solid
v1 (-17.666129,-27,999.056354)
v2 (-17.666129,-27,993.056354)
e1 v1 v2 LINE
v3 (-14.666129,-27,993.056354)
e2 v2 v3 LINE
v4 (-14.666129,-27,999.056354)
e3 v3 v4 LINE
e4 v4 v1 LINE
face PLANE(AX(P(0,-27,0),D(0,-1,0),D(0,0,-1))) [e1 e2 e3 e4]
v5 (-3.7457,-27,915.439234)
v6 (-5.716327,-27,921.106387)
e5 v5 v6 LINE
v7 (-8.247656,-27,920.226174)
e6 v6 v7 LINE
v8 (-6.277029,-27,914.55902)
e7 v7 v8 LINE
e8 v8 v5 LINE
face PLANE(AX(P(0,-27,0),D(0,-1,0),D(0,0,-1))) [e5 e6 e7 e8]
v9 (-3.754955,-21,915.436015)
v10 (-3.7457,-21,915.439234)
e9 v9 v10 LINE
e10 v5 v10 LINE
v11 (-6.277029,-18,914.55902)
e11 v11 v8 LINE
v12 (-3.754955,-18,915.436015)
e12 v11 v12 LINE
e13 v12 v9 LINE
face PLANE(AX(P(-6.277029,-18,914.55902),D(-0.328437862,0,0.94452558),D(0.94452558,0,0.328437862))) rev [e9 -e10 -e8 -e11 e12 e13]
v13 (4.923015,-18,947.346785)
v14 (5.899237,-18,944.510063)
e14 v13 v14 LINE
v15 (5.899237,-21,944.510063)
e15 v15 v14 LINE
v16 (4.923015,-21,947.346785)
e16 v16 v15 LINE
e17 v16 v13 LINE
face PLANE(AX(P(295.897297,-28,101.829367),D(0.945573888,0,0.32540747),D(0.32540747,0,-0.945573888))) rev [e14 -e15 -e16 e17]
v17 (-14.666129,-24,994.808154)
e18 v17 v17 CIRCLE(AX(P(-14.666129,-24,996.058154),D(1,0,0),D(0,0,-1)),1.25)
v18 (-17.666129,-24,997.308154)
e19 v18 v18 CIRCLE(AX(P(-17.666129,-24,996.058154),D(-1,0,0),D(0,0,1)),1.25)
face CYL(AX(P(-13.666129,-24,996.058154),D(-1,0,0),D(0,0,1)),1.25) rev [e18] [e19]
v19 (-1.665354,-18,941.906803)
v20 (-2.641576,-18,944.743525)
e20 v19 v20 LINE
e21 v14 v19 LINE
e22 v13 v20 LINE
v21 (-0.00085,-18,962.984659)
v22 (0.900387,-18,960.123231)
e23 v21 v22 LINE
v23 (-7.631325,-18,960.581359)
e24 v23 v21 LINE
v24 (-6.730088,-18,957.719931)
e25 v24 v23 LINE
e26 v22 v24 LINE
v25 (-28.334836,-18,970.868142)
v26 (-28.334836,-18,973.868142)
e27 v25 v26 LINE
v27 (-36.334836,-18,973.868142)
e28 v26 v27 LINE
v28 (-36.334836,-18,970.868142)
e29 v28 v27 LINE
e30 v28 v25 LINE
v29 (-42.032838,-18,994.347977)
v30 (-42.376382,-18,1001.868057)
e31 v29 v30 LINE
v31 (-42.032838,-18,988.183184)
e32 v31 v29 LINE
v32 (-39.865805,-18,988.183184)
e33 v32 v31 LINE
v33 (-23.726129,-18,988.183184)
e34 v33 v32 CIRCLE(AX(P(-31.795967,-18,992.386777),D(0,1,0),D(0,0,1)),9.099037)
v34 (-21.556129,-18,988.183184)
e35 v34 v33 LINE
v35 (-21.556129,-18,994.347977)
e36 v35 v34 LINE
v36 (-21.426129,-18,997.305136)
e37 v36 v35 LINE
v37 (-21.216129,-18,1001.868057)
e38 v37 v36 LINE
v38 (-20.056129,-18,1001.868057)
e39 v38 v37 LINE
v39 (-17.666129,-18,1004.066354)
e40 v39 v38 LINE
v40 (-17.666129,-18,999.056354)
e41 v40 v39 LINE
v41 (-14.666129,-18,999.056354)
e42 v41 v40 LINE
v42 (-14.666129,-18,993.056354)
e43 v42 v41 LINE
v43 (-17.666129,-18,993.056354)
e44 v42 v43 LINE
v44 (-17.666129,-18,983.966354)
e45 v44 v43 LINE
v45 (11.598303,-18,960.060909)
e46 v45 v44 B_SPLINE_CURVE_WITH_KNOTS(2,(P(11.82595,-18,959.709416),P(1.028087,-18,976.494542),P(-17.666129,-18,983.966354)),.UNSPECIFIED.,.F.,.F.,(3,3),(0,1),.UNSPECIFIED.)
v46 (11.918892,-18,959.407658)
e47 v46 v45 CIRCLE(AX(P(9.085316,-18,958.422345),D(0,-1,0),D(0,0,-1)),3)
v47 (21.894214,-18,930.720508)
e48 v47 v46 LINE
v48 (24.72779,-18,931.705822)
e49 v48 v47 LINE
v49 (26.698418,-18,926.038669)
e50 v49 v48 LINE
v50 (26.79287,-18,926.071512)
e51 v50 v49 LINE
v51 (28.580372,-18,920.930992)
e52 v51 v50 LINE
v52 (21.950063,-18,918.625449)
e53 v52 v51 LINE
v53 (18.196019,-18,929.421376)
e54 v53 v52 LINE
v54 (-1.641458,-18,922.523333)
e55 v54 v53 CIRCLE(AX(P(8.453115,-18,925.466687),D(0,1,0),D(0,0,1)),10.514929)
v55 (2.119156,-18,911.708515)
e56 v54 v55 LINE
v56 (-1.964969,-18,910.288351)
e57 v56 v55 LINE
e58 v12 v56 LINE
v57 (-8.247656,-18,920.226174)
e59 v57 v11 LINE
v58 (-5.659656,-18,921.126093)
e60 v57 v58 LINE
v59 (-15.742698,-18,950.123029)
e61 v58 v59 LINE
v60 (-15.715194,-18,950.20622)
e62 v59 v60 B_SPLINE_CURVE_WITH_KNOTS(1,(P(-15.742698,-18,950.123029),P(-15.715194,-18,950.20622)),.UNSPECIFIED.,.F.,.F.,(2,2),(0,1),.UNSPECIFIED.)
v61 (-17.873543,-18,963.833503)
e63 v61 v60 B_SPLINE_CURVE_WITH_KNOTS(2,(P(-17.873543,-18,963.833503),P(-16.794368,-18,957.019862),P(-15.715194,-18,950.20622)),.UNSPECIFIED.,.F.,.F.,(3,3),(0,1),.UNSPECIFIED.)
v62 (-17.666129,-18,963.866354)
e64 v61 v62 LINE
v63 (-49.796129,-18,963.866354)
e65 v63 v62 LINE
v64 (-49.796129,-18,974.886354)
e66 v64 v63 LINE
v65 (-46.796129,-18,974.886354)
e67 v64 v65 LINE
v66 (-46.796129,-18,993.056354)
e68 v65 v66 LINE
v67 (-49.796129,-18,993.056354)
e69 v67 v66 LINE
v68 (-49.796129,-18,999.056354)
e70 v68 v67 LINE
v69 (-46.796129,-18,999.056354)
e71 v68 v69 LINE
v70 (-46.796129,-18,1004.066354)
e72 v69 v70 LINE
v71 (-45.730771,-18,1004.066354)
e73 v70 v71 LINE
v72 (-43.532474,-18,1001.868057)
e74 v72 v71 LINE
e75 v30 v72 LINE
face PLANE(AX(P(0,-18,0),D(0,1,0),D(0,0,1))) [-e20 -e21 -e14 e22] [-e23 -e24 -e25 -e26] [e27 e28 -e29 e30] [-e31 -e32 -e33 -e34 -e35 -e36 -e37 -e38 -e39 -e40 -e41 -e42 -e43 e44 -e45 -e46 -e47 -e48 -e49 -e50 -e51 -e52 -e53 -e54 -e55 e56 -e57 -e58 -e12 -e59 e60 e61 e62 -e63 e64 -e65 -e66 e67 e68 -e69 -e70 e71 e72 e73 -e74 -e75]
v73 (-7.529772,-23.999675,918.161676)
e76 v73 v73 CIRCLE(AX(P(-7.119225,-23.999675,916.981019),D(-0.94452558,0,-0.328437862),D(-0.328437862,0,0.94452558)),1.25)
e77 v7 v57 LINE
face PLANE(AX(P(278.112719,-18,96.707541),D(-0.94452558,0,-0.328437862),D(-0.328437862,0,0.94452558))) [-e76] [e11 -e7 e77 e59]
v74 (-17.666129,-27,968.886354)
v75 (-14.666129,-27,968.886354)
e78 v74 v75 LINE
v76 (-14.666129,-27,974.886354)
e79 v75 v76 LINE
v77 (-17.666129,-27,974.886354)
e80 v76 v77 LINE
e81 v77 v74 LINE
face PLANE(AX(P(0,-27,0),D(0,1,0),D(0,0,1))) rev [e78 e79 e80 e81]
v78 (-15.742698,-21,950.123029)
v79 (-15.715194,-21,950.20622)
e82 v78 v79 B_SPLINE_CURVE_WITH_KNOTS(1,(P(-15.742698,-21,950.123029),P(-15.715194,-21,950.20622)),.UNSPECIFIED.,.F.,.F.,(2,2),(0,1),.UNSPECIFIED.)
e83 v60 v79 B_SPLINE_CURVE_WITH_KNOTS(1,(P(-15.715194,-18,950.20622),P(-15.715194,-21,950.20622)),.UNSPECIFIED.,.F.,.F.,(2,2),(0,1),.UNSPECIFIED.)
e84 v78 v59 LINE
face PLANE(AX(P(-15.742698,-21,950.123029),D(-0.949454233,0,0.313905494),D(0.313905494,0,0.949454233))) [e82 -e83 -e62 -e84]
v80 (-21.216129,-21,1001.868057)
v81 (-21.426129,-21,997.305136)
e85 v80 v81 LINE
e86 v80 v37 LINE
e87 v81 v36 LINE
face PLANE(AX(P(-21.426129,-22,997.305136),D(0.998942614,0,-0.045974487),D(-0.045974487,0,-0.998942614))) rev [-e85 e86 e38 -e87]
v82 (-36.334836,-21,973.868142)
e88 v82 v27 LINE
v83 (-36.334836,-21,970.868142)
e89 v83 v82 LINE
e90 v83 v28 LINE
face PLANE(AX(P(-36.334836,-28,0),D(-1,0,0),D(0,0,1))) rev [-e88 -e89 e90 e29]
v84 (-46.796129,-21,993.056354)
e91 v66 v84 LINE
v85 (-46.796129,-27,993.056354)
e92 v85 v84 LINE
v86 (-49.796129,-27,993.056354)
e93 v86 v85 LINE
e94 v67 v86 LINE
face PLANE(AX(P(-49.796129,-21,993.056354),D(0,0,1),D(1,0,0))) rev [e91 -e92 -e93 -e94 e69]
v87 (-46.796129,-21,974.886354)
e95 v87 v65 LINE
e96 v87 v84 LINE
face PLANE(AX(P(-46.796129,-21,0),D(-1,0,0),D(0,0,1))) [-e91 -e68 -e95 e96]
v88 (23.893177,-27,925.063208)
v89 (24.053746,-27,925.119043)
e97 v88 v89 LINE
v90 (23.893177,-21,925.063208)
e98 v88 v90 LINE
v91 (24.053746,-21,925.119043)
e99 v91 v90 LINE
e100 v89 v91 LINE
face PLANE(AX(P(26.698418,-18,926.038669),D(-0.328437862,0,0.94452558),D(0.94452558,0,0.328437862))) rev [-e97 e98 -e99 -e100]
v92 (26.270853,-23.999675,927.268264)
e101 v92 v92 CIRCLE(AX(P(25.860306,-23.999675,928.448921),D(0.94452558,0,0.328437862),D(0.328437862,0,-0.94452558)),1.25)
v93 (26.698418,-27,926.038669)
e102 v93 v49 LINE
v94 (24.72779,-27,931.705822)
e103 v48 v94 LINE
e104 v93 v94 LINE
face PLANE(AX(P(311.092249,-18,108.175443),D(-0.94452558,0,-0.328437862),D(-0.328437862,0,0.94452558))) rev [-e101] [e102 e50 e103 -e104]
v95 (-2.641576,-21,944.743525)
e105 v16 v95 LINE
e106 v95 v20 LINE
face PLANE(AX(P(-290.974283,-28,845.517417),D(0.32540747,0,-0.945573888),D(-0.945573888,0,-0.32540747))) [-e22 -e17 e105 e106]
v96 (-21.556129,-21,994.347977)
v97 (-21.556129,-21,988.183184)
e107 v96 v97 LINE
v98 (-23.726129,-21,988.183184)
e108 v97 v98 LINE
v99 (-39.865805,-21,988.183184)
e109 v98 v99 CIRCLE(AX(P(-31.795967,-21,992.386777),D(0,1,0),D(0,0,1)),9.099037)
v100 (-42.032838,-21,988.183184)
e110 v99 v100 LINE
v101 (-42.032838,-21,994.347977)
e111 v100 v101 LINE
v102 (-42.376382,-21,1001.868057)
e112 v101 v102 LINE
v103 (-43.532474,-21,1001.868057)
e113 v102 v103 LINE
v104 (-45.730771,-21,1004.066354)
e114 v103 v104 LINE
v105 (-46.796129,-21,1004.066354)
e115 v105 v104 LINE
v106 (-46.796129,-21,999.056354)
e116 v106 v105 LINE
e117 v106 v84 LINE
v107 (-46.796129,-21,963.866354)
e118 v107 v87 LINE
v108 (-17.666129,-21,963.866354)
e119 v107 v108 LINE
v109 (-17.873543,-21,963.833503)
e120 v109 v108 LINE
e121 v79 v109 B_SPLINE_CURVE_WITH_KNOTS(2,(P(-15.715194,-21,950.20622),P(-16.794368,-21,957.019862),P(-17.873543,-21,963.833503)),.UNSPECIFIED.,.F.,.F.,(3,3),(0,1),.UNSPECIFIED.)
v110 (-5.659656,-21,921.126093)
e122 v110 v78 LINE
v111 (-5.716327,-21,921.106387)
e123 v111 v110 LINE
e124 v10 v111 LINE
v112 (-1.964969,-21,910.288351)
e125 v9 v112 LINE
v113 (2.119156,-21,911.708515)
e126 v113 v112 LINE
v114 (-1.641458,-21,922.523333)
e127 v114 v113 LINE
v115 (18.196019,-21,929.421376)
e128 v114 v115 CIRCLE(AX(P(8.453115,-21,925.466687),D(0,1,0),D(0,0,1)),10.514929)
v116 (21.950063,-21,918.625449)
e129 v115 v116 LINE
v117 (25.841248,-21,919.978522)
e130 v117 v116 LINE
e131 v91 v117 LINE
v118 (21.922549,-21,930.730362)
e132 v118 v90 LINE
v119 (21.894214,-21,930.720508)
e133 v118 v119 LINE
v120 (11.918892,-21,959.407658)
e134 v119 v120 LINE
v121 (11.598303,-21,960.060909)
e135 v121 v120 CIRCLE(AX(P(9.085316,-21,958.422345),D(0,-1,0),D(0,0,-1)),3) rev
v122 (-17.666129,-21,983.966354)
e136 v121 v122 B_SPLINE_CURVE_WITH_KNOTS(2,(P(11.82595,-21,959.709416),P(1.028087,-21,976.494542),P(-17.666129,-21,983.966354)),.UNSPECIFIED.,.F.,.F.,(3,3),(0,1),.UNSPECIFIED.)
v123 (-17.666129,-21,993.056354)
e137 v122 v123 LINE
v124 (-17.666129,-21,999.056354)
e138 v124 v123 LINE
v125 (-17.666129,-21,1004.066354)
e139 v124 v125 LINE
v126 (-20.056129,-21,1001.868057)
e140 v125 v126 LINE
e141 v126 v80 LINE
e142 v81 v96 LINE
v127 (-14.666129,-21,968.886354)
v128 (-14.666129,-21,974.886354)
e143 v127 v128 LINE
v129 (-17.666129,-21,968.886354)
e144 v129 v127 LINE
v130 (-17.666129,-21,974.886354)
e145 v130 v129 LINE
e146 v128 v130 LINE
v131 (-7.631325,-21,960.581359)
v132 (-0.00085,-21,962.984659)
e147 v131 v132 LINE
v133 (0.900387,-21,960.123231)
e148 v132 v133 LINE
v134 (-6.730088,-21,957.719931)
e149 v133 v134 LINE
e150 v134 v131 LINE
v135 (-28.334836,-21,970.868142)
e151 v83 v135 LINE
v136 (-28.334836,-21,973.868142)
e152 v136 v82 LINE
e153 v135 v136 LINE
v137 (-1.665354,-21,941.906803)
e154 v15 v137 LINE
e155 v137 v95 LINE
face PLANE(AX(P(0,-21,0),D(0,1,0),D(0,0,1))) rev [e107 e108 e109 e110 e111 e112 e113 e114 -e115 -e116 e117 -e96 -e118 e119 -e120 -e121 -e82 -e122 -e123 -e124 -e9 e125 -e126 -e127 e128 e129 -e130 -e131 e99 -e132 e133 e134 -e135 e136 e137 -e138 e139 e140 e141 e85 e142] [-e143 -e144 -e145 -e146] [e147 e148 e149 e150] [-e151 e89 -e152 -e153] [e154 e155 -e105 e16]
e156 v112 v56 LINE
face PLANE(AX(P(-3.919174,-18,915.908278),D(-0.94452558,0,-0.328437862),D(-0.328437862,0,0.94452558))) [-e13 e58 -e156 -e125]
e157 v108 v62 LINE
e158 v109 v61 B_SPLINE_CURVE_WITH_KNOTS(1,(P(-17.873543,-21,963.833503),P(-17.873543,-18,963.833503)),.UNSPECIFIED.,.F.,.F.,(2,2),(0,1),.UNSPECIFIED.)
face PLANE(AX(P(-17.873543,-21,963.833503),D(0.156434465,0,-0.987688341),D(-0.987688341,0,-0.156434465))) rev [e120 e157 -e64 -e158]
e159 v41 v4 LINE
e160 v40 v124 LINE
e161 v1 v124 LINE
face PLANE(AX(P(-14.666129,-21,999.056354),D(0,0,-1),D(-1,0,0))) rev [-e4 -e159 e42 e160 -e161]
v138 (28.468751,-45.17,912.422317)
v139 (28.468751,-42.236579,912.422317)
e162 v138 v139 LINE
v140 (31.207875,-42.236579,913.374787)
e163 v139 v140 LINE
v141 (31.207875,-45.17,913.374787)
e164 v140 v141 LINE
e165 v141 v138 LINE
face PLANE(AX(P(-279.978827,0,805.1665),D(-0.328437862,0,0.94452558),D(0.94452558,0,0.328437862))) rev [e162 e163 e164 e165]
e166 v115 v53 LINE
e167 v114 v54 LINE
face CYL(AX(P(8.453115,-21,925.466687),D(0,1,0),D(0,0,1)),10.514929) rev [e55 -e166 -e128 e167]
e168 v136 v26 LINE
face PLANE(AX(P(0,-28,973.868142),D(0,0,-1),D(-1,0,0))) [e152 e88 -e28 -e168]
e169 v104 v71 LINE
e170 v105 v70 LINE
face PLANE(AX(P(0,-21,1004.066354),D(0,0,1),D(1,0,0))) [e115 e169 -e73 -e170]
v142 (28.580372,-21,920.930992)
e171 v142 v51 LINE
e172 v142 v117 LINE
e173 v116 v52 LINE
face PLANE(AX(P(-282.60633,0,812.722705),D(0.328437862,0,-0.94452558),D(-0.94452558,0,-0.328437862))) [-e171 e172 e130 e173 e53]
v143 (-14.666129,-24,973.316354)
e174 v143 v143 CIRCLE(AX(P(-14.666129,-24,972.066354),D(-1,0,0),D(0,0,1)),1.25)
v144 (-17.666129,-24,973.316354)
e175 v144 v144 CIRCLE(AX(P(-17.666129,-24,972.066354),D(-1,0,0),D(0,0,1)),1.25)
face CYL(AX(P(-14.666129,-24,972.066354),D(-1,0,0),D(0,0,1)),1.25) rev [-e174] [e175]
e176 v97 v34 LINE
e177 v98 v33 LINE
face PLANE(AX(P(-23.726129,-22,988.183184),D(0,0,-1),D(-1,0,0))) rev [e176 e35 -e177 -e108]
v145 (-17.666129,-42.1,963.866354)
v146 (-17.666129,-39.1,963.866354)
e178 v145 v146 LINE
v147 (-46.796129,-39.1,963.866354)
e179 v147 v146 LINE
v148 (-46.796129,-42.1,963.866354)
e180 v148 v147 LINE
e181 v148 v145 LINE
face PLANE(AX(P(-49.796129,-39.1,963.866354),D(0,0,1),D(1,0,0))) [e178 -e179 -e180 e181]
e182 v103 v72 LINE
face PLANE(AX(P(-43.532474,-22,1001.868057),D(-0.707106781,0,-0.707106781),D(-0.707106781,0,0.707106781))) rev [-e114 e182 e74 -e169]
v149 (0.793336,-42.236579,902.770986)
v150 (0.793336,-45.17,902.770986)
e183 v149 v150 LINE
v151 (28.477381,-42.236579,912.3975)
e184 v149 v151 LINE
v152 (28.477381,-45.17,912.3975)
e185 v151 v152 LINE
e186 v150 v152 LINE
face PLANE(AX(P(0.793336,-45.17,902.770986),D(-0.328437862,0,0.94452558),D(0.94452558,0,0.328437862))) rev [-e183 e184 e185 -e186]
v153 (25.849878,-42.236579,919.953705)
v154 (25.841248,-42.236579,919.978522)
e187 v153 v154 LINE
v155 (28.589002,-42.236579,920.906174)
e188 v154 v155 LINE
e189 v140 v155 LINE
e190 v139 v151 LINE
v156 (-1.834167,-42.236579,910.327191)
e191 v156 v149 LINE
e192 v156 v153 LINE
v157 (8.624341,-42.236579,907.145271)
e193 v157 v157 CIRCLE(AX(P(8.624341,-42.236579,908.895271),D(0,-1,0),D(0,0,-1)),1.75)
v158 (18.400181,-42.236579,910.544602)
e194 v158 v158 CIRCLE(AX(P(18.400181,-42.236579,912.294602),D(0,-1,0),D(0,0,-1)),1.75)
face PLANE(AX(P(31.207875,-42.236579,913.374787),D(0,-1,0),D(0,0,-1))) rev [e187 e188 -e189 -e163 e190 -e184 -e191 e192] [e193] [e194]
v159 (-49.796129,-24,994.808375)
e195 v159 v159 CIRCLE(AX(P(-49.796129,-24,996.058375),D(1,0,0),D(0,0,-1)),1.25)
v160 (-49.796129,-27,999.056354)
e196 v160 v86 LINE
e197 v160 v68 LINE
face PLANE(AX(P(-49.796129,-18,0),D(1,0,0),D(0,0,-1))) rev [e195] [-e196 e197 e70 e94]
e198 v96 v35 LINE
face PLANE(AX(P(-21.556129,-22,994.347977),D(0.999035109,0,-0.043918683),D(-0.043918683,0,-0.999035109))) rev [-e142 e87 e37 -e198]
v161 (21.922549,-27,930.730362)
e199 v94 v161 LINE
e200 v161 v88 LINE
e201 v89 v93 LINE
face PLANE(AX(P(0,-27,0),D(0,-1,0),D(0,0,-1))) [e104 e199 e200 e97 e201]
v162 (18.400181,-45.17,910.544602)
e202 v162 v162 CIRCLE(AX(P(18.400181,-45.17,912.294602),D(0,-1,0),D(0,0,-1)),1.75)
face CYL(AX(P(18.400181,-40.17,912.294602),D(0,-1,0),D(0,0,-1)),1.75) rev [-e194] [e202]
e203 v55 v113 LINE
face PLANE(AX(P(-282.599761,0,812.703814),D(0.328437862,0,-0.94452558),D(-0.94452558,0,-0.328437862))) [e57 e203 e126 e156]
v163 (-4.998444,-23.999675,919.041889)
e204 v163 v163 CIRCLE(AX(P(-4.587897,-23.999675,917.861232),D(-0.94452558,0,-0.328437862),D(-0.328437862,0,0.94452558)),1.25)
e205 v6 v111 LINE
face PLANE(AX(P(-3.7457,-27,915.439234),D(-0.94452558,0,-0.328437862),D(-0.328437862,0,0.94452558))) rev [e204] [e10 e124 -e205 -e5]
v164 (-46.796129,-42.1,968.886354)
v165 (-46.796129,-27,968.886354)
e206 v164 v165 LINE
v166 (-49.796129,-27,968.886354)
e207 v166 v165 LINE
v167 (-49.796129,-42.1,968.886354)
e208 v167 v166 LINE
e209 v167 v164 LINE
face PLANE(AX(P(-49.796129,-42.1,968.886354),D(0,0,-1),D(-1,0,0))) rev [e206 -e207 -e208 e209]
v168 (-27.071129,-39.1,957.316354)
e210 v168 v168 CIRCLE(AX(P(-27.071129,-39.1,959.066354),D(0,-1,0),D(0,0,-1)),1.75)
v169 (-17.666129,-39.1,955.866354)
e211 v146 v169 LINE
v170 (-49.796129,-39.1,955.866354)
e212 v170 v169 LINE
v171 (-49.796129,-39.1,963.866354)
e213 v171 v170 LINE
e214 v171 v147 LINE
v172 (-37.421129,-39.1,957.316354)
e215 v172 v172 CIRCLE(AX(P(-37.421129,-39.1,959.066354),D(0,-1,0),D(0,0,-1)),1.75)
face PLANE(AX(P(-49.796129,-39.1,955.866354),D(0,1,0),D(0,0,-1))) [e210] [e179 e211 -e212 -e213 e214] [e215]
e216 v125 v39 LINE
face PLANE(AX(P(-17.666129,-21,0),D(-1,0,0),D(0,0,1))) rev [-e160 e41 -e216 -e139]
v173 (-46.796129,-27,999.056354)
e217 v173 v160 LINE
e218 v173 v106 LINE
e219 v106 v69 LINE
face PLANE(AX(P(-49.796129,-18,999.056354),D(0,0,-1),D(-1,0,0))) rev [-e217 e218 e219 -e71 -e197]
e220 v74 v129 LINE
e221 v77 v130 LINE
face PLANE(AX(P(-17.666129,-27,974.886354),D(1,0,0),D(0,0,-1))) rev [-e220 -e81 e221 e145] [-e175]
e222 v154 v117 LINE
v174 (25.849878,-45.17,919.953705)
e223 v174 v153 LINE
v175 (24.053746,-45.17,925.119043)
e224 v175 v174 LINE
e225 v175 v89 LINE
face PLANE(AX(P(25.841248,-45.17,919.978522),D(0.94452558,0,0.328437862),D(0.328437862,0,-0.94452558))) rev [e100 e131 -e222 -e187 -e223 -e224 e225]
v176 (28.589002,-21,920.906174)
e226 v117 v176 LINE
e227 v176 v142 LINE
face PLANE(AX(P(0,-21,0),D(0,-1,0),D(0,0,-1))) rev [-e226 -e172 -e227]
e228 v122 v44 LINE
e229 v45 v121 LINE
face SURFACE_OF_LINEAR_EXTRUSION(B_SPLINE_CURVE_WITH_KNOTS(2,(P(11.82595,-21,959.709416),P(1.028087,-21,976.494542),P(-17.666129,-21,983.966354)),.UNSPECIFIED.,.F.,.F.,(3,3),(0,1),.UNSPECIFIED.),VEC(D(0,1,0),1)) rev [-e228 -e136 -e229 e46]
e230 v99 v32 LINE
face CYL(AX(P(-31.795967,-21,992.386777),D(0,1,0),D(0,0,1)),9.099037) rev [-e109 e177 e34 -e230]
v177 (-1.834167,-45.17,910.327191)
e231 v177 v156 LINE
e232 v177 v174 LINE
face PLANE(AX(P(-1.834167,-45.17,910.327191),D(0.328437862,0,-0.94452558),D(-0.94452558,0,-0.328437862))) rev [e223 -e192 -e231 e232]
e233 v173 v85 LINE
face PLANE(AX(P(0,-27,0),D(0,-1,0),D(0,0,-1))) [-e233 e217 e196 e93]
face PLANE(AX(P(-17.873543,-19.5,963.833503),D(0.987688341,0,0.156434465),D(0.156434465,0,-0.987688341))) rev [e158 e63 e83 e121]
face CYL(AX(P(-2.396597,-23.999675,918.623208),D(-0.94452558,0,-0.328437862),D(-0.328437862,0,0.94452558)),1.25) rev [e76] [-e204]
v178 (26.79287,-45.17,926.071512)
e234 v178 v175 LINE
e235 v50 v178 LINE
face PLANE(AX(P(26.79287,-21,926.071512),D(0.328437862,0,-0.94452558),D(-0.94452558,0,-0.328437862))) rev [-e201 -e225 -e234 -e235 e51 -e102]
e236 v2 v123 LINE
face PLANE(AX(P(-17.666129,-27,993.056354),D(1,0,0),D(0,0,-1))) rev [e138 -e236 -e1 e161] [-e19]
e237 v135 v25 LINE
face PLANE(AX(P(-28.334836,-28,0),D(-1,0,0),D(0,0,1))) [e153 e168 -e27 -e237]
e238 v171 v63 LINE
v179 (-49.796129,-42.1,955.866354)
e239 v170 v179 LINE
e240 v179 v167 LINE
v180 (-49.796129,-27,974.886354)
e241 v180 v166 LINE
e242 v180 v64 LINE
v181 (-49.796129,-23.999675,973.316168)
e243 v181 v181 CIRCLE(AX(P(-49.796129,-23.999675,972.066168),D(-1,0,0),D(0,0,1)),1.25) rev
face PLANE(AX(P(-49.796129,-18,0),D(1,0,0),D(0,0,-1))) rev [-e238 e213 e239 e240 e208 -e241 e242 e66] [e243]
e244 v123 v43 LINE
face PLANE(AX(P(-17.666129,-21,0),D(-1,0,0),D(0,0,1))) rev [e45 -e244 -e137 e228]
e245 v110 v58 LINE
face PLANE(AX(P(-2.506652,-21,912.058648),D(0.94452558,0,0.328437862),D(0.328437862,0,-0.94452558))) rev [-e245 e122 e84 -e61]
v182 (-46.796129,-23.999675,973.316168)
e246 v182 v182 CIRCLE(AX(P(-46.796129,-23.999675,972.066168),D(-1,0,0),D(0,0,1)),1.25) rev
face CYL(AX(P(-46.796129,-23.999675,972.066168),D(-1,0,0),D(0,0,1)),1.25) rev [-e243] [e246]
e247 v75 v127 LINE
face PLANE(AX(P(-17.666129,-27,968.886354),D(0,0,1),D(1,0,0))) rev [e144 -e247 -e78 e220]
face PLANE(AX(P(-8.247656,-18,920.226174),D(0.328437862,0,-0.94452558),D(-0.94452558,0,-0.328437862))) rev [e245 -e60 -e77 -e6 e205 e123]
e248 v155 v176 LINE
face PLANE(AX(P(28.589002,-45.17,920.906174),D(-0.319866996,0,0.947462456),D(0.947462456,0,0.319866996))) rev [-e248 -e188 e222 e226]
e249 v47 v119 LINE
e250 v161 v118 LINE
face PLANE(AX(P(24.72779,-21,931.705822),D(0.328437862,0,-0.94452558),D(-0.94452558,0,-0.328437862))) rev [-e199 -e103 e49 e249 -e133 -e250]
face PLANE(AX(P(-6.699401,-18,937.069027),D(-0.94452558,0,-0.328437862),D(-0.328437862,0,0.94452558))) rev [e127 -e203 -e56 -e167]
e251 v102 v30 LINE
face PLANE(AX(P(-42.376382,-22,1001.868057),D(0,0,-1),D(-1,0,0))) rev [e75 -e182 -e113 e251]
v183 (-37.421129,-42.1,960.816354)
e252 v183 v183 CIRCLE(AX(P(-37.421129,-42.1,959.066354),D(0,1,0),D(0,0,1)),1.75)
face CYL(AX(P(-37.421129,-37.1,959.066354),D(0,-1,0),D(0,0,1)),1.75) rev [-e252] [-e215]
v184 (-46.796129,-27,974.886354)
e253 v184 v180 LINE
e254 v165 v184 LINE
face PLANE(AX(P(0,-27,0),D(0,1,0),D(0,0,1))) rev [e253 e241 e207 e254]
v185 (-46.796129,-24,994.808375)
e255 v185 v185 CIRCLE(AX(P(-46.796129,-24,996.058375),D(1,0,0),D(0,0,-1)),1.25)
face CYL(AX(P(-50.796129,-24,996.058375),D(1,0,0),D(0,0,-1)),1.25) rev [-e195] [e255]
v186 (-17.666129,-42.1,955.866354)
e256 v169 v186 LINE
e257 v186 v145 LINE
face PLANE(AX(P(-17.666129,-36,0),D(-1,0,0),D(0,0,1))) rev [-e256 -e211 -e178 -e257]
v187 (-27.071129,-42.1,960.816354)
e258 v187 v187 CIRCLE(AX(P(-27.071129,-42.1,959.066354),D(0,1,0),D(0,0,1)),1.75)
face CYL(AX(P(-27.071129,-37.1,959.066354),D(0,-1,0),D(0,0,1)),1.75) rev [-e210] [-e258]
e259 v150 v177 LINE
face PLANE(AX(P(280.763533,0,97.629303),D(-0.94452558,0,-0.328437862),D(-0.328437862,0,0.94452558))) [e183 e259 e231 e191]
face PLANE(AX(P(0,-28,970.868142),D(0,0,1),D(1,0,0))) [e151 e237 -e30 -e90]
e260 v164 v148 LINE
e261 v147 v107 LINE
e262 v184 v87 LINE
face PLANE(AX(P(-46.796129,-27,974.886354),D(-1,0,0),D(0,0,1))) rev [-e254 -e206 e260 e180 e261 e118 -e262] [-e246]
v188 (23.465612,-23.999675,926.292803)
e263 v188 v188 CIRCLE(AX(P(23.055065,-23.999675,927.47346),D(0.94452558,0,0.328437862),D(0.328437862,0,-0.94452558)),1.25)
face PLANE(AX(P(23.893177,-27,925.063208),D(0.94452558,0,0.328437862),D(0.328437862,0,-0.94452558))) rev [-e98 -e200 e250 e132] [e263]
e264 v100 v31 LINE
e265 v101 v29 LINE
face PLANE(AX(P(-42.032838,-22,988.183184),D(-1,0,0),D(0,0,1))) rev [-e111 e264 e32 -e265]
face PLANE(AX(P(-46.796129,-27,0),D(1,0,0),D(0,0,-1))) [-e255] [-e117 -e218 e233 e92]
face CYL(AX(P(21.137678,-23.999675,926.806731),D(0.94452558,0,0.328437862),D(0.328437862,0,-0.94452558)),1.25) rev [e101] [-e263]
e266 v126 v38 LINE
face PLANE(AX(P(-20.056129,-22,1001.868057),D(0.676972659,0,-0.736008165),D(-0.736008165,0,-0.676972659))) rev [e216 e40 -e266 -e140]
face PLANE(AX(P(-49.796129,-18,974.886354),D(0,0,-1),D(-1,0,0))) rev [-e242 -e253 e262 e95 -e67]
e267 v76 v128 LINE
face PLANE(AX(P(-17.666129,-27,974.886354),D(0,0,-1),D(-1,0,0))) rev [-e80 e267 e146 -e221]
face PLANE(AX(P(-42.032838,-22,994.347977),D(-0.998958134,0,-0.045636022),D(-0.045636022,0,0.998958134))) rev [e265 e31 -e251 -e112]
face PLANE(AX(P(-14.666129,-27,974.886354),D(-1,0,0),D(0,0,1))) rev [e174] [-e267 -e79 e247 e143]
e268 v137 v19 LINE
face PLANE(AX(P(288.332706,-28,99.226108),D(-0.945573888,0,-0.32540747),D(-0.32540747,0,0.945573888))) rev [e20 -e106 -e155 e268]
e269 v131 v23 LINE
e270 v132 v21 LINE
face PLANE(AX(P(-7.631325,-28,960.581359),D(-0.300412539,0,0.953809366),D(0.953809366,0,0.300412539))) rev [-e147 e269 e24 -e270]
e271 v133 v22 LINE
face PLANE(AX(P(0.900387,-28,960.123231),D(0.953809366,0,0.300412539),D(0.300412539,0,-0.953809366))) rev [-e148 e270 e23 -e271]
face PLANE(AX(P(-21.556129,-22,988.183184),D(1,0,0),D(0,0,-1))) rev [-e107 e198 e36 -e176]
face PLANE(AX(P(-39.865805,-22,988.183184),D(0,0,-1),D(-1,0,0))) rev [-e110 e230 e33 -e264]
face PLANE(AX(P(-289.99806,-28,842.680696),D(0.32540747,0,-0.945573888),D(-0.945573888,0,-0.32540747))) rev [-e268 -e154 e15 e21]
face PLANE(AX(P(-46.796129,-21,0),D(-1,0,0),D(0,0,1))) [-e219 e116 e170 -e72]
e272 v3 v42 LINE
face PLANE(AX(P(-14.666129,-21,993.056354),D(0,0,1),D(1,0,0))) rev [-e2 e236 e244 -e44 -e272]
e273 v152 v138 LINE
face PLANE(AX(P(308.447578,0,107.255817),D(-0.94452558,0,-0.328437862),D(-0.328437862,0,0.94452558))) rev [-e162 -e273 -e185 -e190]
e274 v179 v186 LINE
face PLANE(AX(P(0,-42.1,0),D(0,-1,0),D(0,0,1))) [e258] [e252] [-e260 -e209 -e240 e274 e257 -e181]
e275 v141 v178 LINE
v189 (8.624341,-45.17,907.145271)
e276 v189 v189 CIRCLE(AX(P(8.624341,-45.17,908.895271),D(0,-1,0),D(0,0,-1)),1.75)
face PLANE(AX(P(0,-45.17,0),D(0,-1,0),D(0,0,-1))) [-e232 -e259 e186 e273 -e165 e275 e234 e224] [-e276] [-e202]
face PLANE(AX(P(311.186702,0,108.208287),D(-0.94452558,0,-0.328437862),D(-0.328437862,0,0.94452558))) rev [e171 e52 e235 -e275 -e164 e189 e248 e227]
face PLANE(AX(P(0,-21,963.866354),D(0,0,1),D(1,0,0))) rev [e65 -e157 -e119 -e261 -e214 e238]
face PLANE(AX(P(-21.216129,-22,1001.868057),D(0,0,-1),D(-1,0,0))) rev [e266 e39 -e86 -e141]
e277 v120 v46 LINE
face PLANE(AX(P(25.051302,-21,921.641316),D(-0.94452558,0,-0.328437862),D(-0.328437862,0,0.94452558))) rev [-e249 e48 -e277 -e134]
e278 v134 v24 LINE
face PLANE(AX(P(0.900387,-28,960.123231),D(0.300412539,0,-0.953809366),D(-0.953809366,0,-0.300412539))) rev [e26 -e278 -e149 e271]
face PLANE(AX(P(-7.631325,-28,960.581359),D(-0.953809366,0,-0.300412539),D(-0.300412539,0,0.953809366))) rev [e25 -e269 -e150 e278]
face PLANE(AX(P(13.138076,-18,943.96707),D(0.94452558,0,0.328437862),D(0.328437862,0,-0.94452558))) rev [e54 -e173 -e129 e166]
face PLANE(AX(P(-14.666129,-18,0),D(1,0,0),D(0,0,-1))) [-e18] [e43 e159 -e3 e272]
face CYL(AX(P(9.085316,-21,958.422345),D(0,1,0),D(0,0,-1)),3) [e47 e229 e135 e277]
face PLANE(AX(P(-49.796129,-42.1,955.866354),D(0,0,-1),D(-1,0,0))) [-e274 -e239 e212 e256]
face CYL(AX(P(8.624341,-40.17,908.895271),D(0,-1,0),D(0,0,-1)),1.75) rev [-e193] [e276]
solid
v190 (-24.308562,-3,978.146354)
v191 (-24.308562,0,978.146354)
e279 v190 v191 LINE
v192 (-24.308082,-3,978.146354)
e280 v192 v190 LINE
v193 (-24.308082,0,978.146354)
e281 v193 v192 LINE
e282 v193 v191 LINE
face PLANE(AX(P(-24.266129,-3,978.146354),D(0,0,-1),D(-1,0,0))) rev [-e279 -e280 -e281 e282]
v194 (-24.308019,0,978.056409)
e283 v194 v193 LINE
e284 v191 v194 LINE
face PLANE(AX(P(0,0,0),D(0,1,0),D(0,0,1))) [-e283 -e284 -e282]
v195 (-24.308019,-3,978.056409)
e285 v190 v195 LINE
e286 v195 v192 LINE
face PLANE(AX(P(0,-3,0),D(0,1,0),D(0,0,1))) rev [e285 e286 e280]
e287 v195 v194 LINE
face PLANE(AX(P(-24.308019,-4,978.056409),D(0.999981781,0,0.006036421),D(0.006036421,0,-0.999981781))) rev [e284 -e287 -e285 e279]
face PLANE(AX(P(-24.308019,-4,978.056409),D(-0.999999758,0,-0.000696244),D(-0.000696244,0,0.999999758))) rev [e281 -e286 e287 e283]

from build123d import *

# Parameters (mm, degrees)
SKETCH1_W                 = 29.13
SKETCH1_H                 = 40.2
BOSS_EXTRUDE1_DEPTH       = 3
SKETCH3_W                 = 6
SKETCH3_H                 = 3
BOSS_EXTRUDE2_DEPTH       = 3
SKETCH4_W                 = 3
SKETCH4_H                 = 6
BOSS_EXTRUDE3_DEPTH       = 6
SKETCH6_W                 = 6
SKETCH6_H                 = 3
BOSS_EXTRUDE4_DEPTH       = 2
SKETCH7_W                 = 3.000000005
SKETCH7_H                 = 6
BOSS_EXTRUDE6_DEPTH       = 6
SKETCH9_R                 = 1.25
CUT_EXTRUDE1_DEPTH        = 3
SKETCH8_R                 = 1.250000001
CUT_EXTRUDE2_DEPTH        = 3
SKETCH11_W                = 6
SKETCH11_H                = 3
BOSS_EXTRUDE7_DEPTH       = 3
SKETCH19_W                = 3
SKETCH19_H                = 6
BOSS_EXTRUDE11_DEPTH      = 6
SKETCH21_W                = 6
SKETCH21_H                = 3
BOSS_EXTRUDE12_DEPTH      = 3
SKETCH22_W                = 3
SKETCH22_H                = 6
BOSS_EXTRUDE13_DEPTH      = 6
SKETCH24_R                = 1.25
CUT_EXTRUDE5_DEPTH        = 4
SKETCH23_R                = 1.25
CUT_EXTRUDE6_DEPTH        = 4
CUT_EXTRUDE8_DEPTH        = 4
CUT_EXTRUDE11_DEPTH       = 4
SKETCH30_W                = 25.92
SKETCH30_H                = 3
CUT_EXTRUDE12_DEPTH       = 15
SKETCH33_W                = 29.17650364
SKETCH33_H                = 3
BOSS_EXTRUDE14_DEPTH      = 40.3
SKETCH34_W                = 21.00258235
SKETCH34_H                = 3
CUT_EXTRUDE15_DEPTH       = 25
CUT_EXTRUDE16_DEPTH       = 5
SKETCH37_W                = 4.5
SKETCH37_H                = 3
SKETCH37_W_2              = 1.5
BOSS_EXTRUDE15_DEPTH      = 3
BOSS_EXTRUDE16_DEPTH      = 6
SKETCH41_W                = 6
SKETCH41_H                = 3
BOSS_EXTRUDE17_DEPTH      = 3
BOSS_EXTRUDE18_DEPTH      = 6
SKETCH46_W                = 5.02
SKETCH46_H                = 3
BOSS_EXTRUDE19_DEPTH      = 3
SKETCH48_W                = 3
SKETCH48_H                = 5.02
BOSS_EXTRUDE20_DEPTH      = 21.1
BOSS_EXTRUDE22_DEPTH      = 29.13
BOSS_EXTRUDE22_DEPTH_BACK = 3
SKETCH50_W                = 8
SKETCH50_H                = 3
SKETCH51_R                = 1.75
CUT_EXTRUDE21_DEPTH       = 5
SKETCH56_W                = 3.994197227
SKETCH56_H                = 3.994197227
CUT_EXTRUDE26_DEPTH       = 0.1
FILLET4_START             = -19
FILLET4_DEPTH             = 5
BOSS_EXTRUDE28_DEPTH      = 0.21
BOSS_EXTRUDE29_DEPTH      = 3
BOSS_EXTRUDE30_DEPTH      = 1.95
BOSS_EXTRUDE30_DEPTH_BACK = 4
SKETCH68_W                = 4.32399603
SKETCH68_H                = 3
SKETCH69_W                = 3.919724064
SKETCH69_H                = 3
BOSS_EXTRUDE31_DEPTH      = 1.83
SKETCH70_W                = 5.44243662
SKETCH70_H                = 3
BOSS_EXTRUDE32_DEPTH      = 3.1
BOSS_EXTRUDE33_DEPTH      = 24.17
SKETCH72_W                = 2.9
SKETCH72_H                = 2.93342148
BOSS_EXTRUDE34_DEPTH      = 8
SKETCH73_W                = 8
SKETCH73_H                = 2.93342148
BOSS_EXTRUDE35_DEPTH      = 29.31
SKETCH74_R                = 1.75
CUT_EXTRUDE27_DEPTH       = 5
SKETCH75_R                = 1.25
CUT_EXTRUDE28_DEPTH       = 5
SKETCH76_R                = 1.25
CUT_EXTRUDE29_DEPTH       = 5
BOSS_EXTRUDE36_DEPTH      = 3
BOSS_EXTRUDE37_DEPTH      = 3
SKETCH79_W                = 8
SKETCH79_H                = 3
CUT_EXTRUDE30_DEPTH       = 10
CUT_EXTRUDE31_DEPTH       = 10


with BuildPart() as part:
    # Sketch1 → Boss-Extrude1 (new body)
    with BuildSketch(Plane(origin=(0, 0, 0), x_dir=(1, 0, 0), z_dir=(0, 1, 0))):
        with Locations((-32.231128585, -983.966354464)):
            Rectangle(SKETCH1_W, SKETCH1_H)
        with BuildLine():
            Line((-15.507778999, -950.239071497), (-17.666128585, -963.866354464))
            Line((-17.666128585, -963.866354464), (-17.666128585, -983.966354464))
            add(Edge.make_bspline(
                [(11.825950039, -959.709415703), (1.028086592, -976.494542347), (-17.666128585, -983.966354464)],
                knots=[0, 0, 0, 1, 1, 1], degree=2))
            Line((11.825950039, -959.709415703), (-15.497121464, -950.208422428))
            Line((-15.497121464, -950.208422428), (-15.507778999, -950.239071497))
        make_face()
    extrude(amount=-BOSS_EXTRUDE1_DEPTH)

    # Sketch3 → Boss-Extrude2 (add)
    with BuildSketch(Plane.ZY.offset(46.796128585)):
        with Locations((971.886354464, -1.5)):
            Rectangle(SKETCH3_W, SKETCH3_H)
    extrude(amount=BOSS_EXTRUDE2_DEPTH)

    # Sketch4 → Boss-Extrude3 (add)
    with BuildSketch(Plane.XZ.offset(3)):
        with Locations((-48.296128585, 971.886354464)):
            Rectangle(SKETCH4_W, SKETCH4_H)
    extrude(amount=BOSS_EXTRUDE3_DEPTH)

    # Sketch6 → Boss-Extrude4 (add)
    with BuildSketch(Plane(origin=(-17.666128585, 0, 0), x_dir=(0, 0, -1), z_dir=(1, 0, 0))):
        with Locations((-971.886354464, -1.5)):
            Rectangle(SKETCH6_W, SKETCH6_H)
    extrude(amount=BOSS_EXTRUDE4_DEPTH)

    # Sketch7 → Boss-Extrude6 (add)
    with BuildSketch(Plane.XZ.offset(3)):
        with Locations((-16.166128583, 971.886354464)):
            Rectangle(SKETCH7_W, SKETCH7_H)
    extrude(amount=BOSS_EXTRUDE6_DEPTH)

    # Sketch9 → Cut-Extrude1 (cut)
    with BuildSketch(Plane.ZY.offset(17.666128585)):
        with Locations((972.066354464, -6)):
            Circle(SKETCH9_R)
    extrude(amount=-CUT_EXTRUDE1_DEPTH, mode=Mode.SUBTRACT)

    # Sketch8 → Cut-Extrude2 (cut)
    with BuildSketch(Plane(origin=(-49.796128585, 0, 0), x_dir=(0, 0, -1), z_dir=(1, 0, 0))):
        with Locations(Location((-972.066168305, -5.999675203, 0), (0, 0, 180))):
            Circle(SKETCH8_R)
    extrude(amount=CUT_EXTRUDE2_DEPTH, mode=Mode.SUBTRACT)

    # Sketch11 → Boss-Extrude7 (add)
    with BuildSketch(Plane.ZY.offset(46.796128585)):
        with Locations((996.056354464, -1.5)):
            Rectangle(SKETCH11_W, SKETCH11_H)
    extrude(amount=BOSS_EXTRUDE7_DEPTH)

    # Sketch19 → Boss-Extrude11 (add)
    with BuildSketch(Plane.XZ.offset(3)):
        with Locations((-48.296128585, 996.056354464)):
            Rectangle(SKETCH19_W, SKETCH19_H)
    extrude(amount=BOSS_EXTRUDE11_DEPTH)

    # Sketch21 → Boss-Extrude12 (add)
    with BuildSketch(Plane(origin=(-17.666128585, 0, 0), x_dir=(0, 0, -1), z_dir=(1, 0, 0))):
        with Locations((-996.056354464, -1.5)):
            Rectangle(SKETCH21_W, SKETCH21_H)
    extrude(amount=BOSS_EXTRUDE12_DEPTH)

    # Sketch22 → Boss-Extrude13 (add)
    with BuildSketch(Plane.XZ.offset(3)):
        with Locations((-16.166128585, 996.056354464)):
            Rectangle(SKETCH22_W, SKETCH22_H)
    extrude(amount=BOSS_EXTRUDE13_DEPTH)

    # Sketch24 → Cut-Extrude5 (cut)
    with BuildSketch(Plane(origin=(-46.796128585, 0, 0), x_dir=(0, 0, -1), z_dir=(1, 0, 0))):
        with Locations((-996.058375158, -6)):
            Circle(SKETCH24_R)
    extrude(amount=-CUT_EXTRUDE5_DEPTH, mode=Mode.SUBTRACT)

    # Sketch23 → Cut-Extrude6 (cut)
    with BuildSketch(Plane.ZY.offset(17.666128585)):
        with Locations((996.058154464, -6)):
            Circle(SKETCH23_R)
    extrude(amount=-CUT_EXTRUDE6_DEPTH, mode=Mode.SUBTRACT)

    # Sketch28 → Cut-Extrude8 (cut)
    with BuildSketch(Plane(origin=(0, 0, 0), x_dir=(1, 0, 0), z_dir=(0, 1, 0))):
        Polygon((-39.266128585, -975.05646378), (-24.308019321, -978.056409122), (-24.326128585, -981.056354464), (-39.266128585, -978.146354464), align=None)
    extrude(amount=-CUT_EXTRUDE8_DEPTH, mode=Mode.SUBTRACT)

    # Sketch29 → Cut-Extrude11 (cut)
    with BuildSketch(Plane(origin=(0, 0, 0), x_dir=(1, 0, 0), z_dir=(0, 1, 0))):
        Polygon((-39.266128585, -975.05646378), (-39.865804676, -988.183184315), (-42.032837695, -988.183184315), (-42.032837695, -994.347976596), (-42.376382193, -1001.868057312), (-43.532474114, -1001.868057312), (-45.730771266, -1004.066354464), (-39.266128585, -1004.066354464), (-39.266128585, -988.183184315), align=None)
        Polygon((-24.308019321, -978.056409122), (-24.326128585, -1004.066354464), (-17.666128585, -1004.066354464), (-20.056128585, -1001.868057312), (-21.216128585, -1001.868057312), (-21.426128585, -997.305136389), (-21.556128585, -994.347976596), (-21.556128585, -988.183184315), (-23.726128585, -988.183184315), align=None)
    extrude(amount=-CUT_EXTRUDE11_DEPTH, mode=Mode.SUBTRACT)


with BuildPart() as cut_extrude11_piece_1:
    # of the separate pieces the step leaves, piece 1, a body of its own (cut_extrude11_pieces)
    add(part.part.solids().sort_by_distance((-17.666128585, 0, 983.966354464))[0])


with BuildPart() as cut_extrude11_piece_2:
    # of the separate pieces the step leaves, piece 2, a body of its own (cut_extrude11_pieces)
    add(part.part.solids().sort_by_distance((-24.326128585, 0, 1004.066354464))[0])


with BuildPart() as cut_extrude12_tool:
    # Sketch30 → Cut-Extrude12 (new body)
    with BuildSketch(Plane.ZY.offset(39.266128585)):
        with Locations((991.106354464, -1.5)):
            Rectangle(SKETCH30_W, SKETCH30_H)
    extrude(amount=-CUT_EXTRUDE12_DEPTH)


with BuildPart() as cut_extrude11_piece_1_1:
    add(cut_extrude11_piece_1.part)

    # Cut-Extrude12: cut by cut_extrude12_tool
    add(cut_extrude12_tool.part, mode=Mode.SUBTRACT)

    # Sketch33 → Boss-Extrude14 (add)
    with BuildSketch(Plane(origin=(-296.443416752, 0, 852.515567448), x_dir=(-0.9445255798324886, 0, -0.32843786176703366), z_dir=(0.3284378617670337, 0, -0.9445255798324887))):
        with Locations((-311.77524668, -1.5)):
            Rectangle(SKETCH33_W, SKETCH33_H)
    extrude(amount=BOSS_EXTRUDE14_DEPTH)

    # Sketch34 → Cut-Extrude15 (cut)
    with BuildSketch(Plane(origin=(-283.207370923, 0, 814.451186581), x_dir=(-0.9445255798324887, 0, -0.32843786176703327), z_dir=(0.32843786176703327, 0, -0.9445255798324887))):
        with Locations((-311.942483261, -1.5)):
            Rectangle(SKETCH34_W, SKETCH34_H)
    extrude(amount=-CUT_EXTRUDE15_DEPTH, mode=Mode.SUBTRACT)

    # Sketch35 → Cut-Extrude16 (cut)
    with BuildSketch(Plane(origin=(0, 0, 0), x_dir=(1, 0, 0), z_dir=(0, 1, 0))):
        Polygon((-6.699400727, -937.069026653), (11.67040627, -948.187810964), (13.138075545, -943.967069892), align=None)
    extrude(amount=-CUT_EXTRUDE16_DEPTH, mode=Mode.SUBTRACT)

    # Sketch37 → Boss-Extrude15 (add)
    with BuildSketch(Plane(origin=(280.946295288, 0, 97.69285498), x_dir=(-0.32843786176743117, 0, 0.9445255798323505), z_dir=(-0.9445255798323505, 0, -0.32843786176743117))):
        with Locations((868.136002588, -1.5)):
            Rectangle(SKETCH37_W, SKETCH37_H)
        with Locations((871.136002588, -1.5)):
            Rectangle(SKETCH37_W_2, SKETCH37_H)
    extrude(amount=BOSS_EXTRUDE15_DEPTH)

    # Sketch39 → Boss-Extrude16 (add)
    with BuildSketch(Plane.XZ.offset(3)):
        Polygon((-6.277028676, 914.559020058), (-3.745700122, 915.439233528), (-5.716327292, 921.106387007), (-8.247655846, 920.226173537), align=None)
    extrude(amount=BOSS_EXTRUDE16_DEPTH)

    # Sketch41 → Boss-Extrude17 (add)
    with BuildSketch(Plane(origin=(308.258672657, 0, 107.190129606), x_dir=(0.3284378617670337, 0, -0.9445255798324887), z_dir=(0.9445255798324887, 0, 0.3284378617670337))):
        with Locations((-868.898439213, -1.5)):
            Rectangle(SKETCH41_W, SKETCH41_H)
    extrude(amount=BOSS_EXTRUDE17_DEPTH)

    # Sketch42 → Boss-Extrude18 (add)
    with BuildSketch(Plane.XZ.offset(3)):
        Polygon((23.893176542, 925.063208116), (21.922549371, 930.730361595), (24.727790343, 931.705822044), (26.698417514, 926.038668565), align=None)
    extrude(amount=BOSS_EXTRUDE18_DEPTH)


with BuildPart() as cut_extrude11_piece_2_1:
    add(cut_extrude11_piece_2.part)

    # Cut-Extrude12: cut by cut_extrude12_tool
    add(cut_extrude12_tool.part, mode=Mode.SUBTRACT)


with BuildPart() as body_3:
    # Mirror1: mirrored copy
    add(cut_extrude11_piece_1_1.part.mirror(Plane(origin=(0, -9, 0), x_dir=(0, 0, 1), z_dir=(0, -1, 0))))

    # Sketch46 → Boss-Extrude19 (add)
    with BuildSketch(Plane.ZY.offset(46.796128585)):
        with Locations((966.376354464, -16.5)):
            Rectangle(SKETCH46_W, SKETCH46_H)
    extrude(amount=BOSS_EXTRUDE19_DEPTH)

    # Sketch48 → Boss-Extrude20 (add)
    with BuildSketch(Plane(origin=(0, -15, 0), x_dir=(1, 0, 0), z_dir=(0, 1, 0))):
        with Locations((-48.296128585, -966.376354464)):
            Rectangle(SKETCH48_W, SKETCH48_H)
    extrude(amount=BOSS_EXTRUDE20_DEPTH)

    # Sketch50 → Boss-Extrude22 (add, two sides: drawn at the far end of the back side and taken through both)
    with BuildSketch(Plane(origin=(-46.796128585, 0, 0), x_dir=(0, 0, -1), z_dir=(1, 0, 0)).offset(-BOSS_EXTRUDE22_DEPTH_BACK)):
        with Locations((-959.866354464, 4.6)):
            Rectangle(SKETCH50_W, SKETCH50_H)
    extrude(amount=BOSS_EXTRUDE22_DEPTH + BOSS_EXTRUDE22_DEPTH_BACK)

    # Sketch51 → Cut-Extrude21 (cut)
    with BuildSketch(Plane(origin=(0, 6.1, 0), x_dir=(1, 0, 0), z_dir=(0, 1, 0))):
        with Locations(Location((-37.42112854, -959.066354487, 0), (0, 0, 270))):
            Circle(SKETCH51_R)
        with Locations(Location((-27.07112854, -959.066354497, 0), (0, 0, 270))):
            Circle(SKETCH51_R)
    extrude(amount=-CUT_EXTRUDE21_DEPTH, mode=Mode.SUBTRACT)

    # Sketch56 → Cut-Extrude26 (cut)
    with BuildSketch(Plane(origin=(-283.207370923, 0, 814.451186581), x_dir=(-0.9445255798324892, 0, -0.32843786176703227), z_dir=(0.32843786176703227, 0, -0.9445255798324892))):
        with Locations((-299.444093473, -16.997098614)):
            Rectangle(SKETCH56_W, SKETCH56_H)
    extrude(amount=-CUT_EXTRUDE26_DEPTH, mode=Mode.SUBTRACT)

    # Fillet4: read off the stored shape, not the designer's step
    # Fillet4 outline → Fillet4 (cut)
    with BuildSketch(Plane(origin=(0, 0, 0), x_dir=(1, 0, 0), z_dir=(0, 1, 0)).offset(FILLET4_START)):
        with BuildLine():
            Line((11.815255904, -959.705697054), (11.918892326, -959.407658179))
            ThreePointArc((11.918892326, -959.407658179), (11.77847749, -959.744040081), (11.598302874, -960.060909482))
            add(Edge.make_bspline(
                [(11.825950039, -959.709415703), (11.712561825, -959.885676085), (11.598302874, -960.060909482)],
                knots=[0, 0, 0, 0.010500986, 0.010500986, 0.010500986], degree=2))
            Line((11.825950039, -959.709415703), (11.815255904, -959.705697054))
        make_face()
    extrude(amount=FILLET4_DEPTH, mode=Mode.SUBTRACT)


with BuildPart() as body_3_2:
    # Mirror2: mirrored copy
    add(body_3.part.mirror(Plane(origin=(-13.535575409, -18, 962.175671275), x_dir=(0, 0, 1), z_dir=(0, -1, 0))))

    # Sketch63 → Boss-Extrude28 (add)
    with BuildSketch(Plane(origin=(131.691734271, 0, 20.857921628), x_dir=(-0.15643446504022615, 0, 0.9876883405951385), z_dir=(-0.9876883405951385, 0, -0.15643446504022615))):
        with BuildLine():
            add(Edge.make_bspline(
                [(954.763151571, -21), (947.864577189, -21), (940.966002807, -21)],
                knots=[0, 0, 0, 1, 1, 1], degree=2))
            Line((940.966002807, -21), (940.966002807, -18))
            add(Edge.make_bspline(
                [(954.763151571, -18), (947.864577189, -18), (940.966002807, -18)],
                knots=[0, 0, 0, 1, 1, 1], degree=2))
            Line((954.763151571, -18), (954.763151571, -21))
        make_face()
    extrude(amount=BOSS_EXTRUDE28_DEPTH)

    # Sketch67 → Boss-Extrude29 (add)
    with BuildSketch(Plane(origin=(0, -18, 0), x_dir=(1, 0, 0), z_dir=(0, 1, 0))):
        Polygon((-15.715193551, -950.206220259), (-15.742698114, -950.123028585), (-15.497121464, -950.208422428), (-15.507778999, -950.239071497), align=None)
    extrude(amount=-BOSS_EXTRUDE29_DEPTH)

    # Sketch68 → Boss-Extrude30 (add, two sides: drawn at the far end of the back side and taken through both)
    with BuildSketch(Plane(origin=(-283.240214709, 0, 814.545639139), x_dir=(-0.9445255798324883, -3.1744861168227707e-15, -0.32843786176703493), z_dir=(0.32843786176703493, -9.129225613729643e-15, -0.9445255798324883)).offset(-BOSS_EXTRUDE30_DEPTH_BACK)):
        with Locations((-299.279194071, -19.5)):
            Rectangle(SKETCH68_W, SKETCH68_H)
    extrude(amount=BOSS_EXTRUDE30_DEPTH + BOSS_EXTRUDE30_DEPTH_BACK)

    # Sketch69 → Boss-Extrude31 (add)
    with BuildSketch(Plane(origin=(-283.207370923, 0, 814.451186581), x_dir=(-0.9445255798324895, 0, -0.32843786176703144), z_dir=(0.32843786176703144, 0, -0.9445255798324895))):
        with Locations((-324.403636468, -19.5)):
            Rectangle(SKETCH69_W, SKETCH69_H)
    extrude(amount=BOSS_EXTRUDE31_DEPTH)

    # Sketch70 → Boss-Extrude32 (add)
    with BuildSketch(Plane(origin=(308.258672657, 0, 107.190129606), x_dir=(0.3284378617670337, 0, -0.9445255798324887), z_dir=(0.9445255798324887, 0, 0.3284378617670337))):
        with Locations((-863.177220903, -19.5)):
            Rectangle(SKETCH70_W, SKETCH70_H)
    extrude(amount=BOSS_EXTRUDE32_DEPTH)

    # Sketch71 → Boss-Extrude33 (add)
    with BuildSketch(Plane.XZ.offset(21)):
        Polygon((28.589002033, 920.906174309), (26.792870072, 926.071512351), (24.05374589, 925.119042552), (25.841248137, 919.978521948), align=None)
    extrude(amount=BOSS_EXTRUDE33_DEPTH)

    # Sketch72 → Boss-Extrude34 (add)
    with BuildSketch(Plane(origin=(-282.606329636, 0, 812.722704769), x_dir=(-0.9445255798324861, 0, -0.3284378617670412), z_dir=(0.3284378617670412, 0, -0.9445255798324861))):
        with Locations((-328.0134985, -43.70328926)):
            Rectangle(SKETCH72_W, SKETCH72_H)
    extrude(amount=BOSS_EXTRUDE34_DEPTH)

    # Sketch73 → Boss-Extrude35 (add)
    with BuildSketch(Plane(origin=(308.447577773, 0, 107.255817179), x_dir=(-0.32843786176702733, 0, 0.9445255798324909), z_dir=(-0.944525579832491, 0, -0.32843786176702733))):
        with Locations((856.429727564, -43.70328926)):
            Rectangle(SKETCH73_W, SKETCH73_H)
    extrude(amount=BOSS_EXTRUDE35_DEPTH)

    # Sketch74 → Cut-Extrude27 (cut)
    with BuildSketch(Plane.XZ.offset(45.17)):
        with Locations(Location((18.400180873, 912.294602496, 0), (0, 0, 270))):
            Circle(SKETCH74_R)
        with Locations(Location((8.624341118, 908.895270636, 0), (0, 0, 270))):
            Circle(SKETCH74_R)
    extrude(amount=-CUT_EXTRUDE27_DEPTH, mode=Mode.SUBTRACT)


with BuildPart() as body_3_3:
    # Mirror3: read off the stored shape, not the designer's step
    # Mirror3: mirrored copy
    add(body_3_2.part.mirror(Plane(origin=(0, -42.1, 0), x_dir=(1, 0, 0), z_dir=(0, 1, 0))))


with BuildPart() as body_3_4:
    # Mirror4: read off the stored shape, not the designer's step
    # Mirror4: mirrored copy
    add(body_3_3.part.mirror(Plane(origin=(0, -42.1, 0), x_dir=(1, 0, 0), z_dir=(0, 1, 0))))

    # Sketch75 → Cut-Extrude28 (cut)
    with BuildSketch(Plane(origin=(278.112718549, 0, 96.707541395), x_dir=(-0.32843786176743106, 0, 0.9445255798323505), z_dir=(-0.9445255798323505, 0, -0.32843786176743106))):
        with Locations((868.450251665, -23.999675203)):
            Circle(SKETCH75_R)
    extrude(amount=-CUT_EXTRUDE28_DEPTH, mode=Mode.SUBTRACT)

    # Sketch76 → Cut-Extrude29 (cut)
    with BuildSketch(Plane(origin=(311.092249396, 0, 108.175443191), x_dir=(0.32843786176703343, 0, -0.9445255798324887), z_dir=(0.9445255798324889, 0, 0.3284378617670335))):
        with Locations(Location((-868.450251635, -23.999675203, 0), (0, 0, 180))):
            Circle(SKETCH76_R)
    extrude(amount=-CUT_EXTRUDE29_DEPTH, mode=Mode.SUBTRACT)

    # Sketch77 → Boss-Extrude36 (add)
    with BuildSketch(Plane(origin=(0, -18, 0), x_dir=(1, 0, 0), z_dir=(0, 1, 0))):
        with BuildLine():
            Line((-39.266128585, -975.05646378), (-39.865804676, -988.183184315))
            ThreePointArc((-39.865804676, -988.183184315), (-31.795966631, -983.287739608), (-23.726128585, -988.183184315))
            Line((-23.726128585, -988.183184315), (-24.266128585, -978.146354464))
            Line((-24.266128585, -978.146354464), (-24.302851007, -978.146354464))
            Line((-24.302851007, -978.146354464), (-24.308019321, -978.056409122))
            Line((-24.308019321, -978.056409122), (-39.266128585, -975.05646378))
        make_face()
    extrude(amount=-BOSS_EXTRUDE36_DEPTH)

    # Sketch78 → Boss-Extrude37 (add)
    with BuildSketch(Plane(origin=(0, -18, 0), x_dir=(1, 0, 0), z_dir=(0, 1, 0))):
        with BuildLine():
            ThreePointArc((18.196018618, -929.421375958), (4.999614304, -935.398306421), (-1.641457655, -922.52333272))
            Line((-1.641457655, -922.52333272), (-6.699400727, -937.069026653))
            Line((-6.699400727, -937.069026653), (11.67040627, -948.187810964))
            Line((11.67040627, -948.187810964), (18.196018618, -929.421375958))
        make_face()
    extrude(amount=-BOSS_EXTRUDE37_DEPTH)

    # Sketch79 → Cut-Extrude30 (cut)
    with BuildSketch(Plane(origin=(0, -18, 0), x_dir=(1, 0, 0), z_dir=(0, 1, 0))):
        with Locations((-32.334835861, -972.368141655)):
            Rectangle(SKETCH79_W, SKETCH79_H)
        Polygon((-2.641576394, -944.743524907), (1.140719159, -946.045154788), (4.923014713, -947.346784669), (5.899237123, -944.510063004), (-1.665353983, -941.906803242), align=None)
    extrude(amount=-CUT_EXTRUDE30_DEPTH, mode=Mode.SUBTRACT)

    # Sketch84 → Cut-Extrude31 (cut)
    with BuildSketch(Plane(origin=(0, -18, 0), x_dir=(1, 0, 0), z_dir=(0, 1, 0))):
        Polygon((-7.631325194, -960.581359171), (-6.730087577, -957.719931073), (0.90038735, -960.123231383), (-0.000850266, -962.984659481), align=None)
    extrude(amount=-CUT_EXTRUDE31_DEPTH, mode=Mode.SUBTRACT)


solid = Compound([cut_extrude11_piece_2_1.part, body_3_4.part])
